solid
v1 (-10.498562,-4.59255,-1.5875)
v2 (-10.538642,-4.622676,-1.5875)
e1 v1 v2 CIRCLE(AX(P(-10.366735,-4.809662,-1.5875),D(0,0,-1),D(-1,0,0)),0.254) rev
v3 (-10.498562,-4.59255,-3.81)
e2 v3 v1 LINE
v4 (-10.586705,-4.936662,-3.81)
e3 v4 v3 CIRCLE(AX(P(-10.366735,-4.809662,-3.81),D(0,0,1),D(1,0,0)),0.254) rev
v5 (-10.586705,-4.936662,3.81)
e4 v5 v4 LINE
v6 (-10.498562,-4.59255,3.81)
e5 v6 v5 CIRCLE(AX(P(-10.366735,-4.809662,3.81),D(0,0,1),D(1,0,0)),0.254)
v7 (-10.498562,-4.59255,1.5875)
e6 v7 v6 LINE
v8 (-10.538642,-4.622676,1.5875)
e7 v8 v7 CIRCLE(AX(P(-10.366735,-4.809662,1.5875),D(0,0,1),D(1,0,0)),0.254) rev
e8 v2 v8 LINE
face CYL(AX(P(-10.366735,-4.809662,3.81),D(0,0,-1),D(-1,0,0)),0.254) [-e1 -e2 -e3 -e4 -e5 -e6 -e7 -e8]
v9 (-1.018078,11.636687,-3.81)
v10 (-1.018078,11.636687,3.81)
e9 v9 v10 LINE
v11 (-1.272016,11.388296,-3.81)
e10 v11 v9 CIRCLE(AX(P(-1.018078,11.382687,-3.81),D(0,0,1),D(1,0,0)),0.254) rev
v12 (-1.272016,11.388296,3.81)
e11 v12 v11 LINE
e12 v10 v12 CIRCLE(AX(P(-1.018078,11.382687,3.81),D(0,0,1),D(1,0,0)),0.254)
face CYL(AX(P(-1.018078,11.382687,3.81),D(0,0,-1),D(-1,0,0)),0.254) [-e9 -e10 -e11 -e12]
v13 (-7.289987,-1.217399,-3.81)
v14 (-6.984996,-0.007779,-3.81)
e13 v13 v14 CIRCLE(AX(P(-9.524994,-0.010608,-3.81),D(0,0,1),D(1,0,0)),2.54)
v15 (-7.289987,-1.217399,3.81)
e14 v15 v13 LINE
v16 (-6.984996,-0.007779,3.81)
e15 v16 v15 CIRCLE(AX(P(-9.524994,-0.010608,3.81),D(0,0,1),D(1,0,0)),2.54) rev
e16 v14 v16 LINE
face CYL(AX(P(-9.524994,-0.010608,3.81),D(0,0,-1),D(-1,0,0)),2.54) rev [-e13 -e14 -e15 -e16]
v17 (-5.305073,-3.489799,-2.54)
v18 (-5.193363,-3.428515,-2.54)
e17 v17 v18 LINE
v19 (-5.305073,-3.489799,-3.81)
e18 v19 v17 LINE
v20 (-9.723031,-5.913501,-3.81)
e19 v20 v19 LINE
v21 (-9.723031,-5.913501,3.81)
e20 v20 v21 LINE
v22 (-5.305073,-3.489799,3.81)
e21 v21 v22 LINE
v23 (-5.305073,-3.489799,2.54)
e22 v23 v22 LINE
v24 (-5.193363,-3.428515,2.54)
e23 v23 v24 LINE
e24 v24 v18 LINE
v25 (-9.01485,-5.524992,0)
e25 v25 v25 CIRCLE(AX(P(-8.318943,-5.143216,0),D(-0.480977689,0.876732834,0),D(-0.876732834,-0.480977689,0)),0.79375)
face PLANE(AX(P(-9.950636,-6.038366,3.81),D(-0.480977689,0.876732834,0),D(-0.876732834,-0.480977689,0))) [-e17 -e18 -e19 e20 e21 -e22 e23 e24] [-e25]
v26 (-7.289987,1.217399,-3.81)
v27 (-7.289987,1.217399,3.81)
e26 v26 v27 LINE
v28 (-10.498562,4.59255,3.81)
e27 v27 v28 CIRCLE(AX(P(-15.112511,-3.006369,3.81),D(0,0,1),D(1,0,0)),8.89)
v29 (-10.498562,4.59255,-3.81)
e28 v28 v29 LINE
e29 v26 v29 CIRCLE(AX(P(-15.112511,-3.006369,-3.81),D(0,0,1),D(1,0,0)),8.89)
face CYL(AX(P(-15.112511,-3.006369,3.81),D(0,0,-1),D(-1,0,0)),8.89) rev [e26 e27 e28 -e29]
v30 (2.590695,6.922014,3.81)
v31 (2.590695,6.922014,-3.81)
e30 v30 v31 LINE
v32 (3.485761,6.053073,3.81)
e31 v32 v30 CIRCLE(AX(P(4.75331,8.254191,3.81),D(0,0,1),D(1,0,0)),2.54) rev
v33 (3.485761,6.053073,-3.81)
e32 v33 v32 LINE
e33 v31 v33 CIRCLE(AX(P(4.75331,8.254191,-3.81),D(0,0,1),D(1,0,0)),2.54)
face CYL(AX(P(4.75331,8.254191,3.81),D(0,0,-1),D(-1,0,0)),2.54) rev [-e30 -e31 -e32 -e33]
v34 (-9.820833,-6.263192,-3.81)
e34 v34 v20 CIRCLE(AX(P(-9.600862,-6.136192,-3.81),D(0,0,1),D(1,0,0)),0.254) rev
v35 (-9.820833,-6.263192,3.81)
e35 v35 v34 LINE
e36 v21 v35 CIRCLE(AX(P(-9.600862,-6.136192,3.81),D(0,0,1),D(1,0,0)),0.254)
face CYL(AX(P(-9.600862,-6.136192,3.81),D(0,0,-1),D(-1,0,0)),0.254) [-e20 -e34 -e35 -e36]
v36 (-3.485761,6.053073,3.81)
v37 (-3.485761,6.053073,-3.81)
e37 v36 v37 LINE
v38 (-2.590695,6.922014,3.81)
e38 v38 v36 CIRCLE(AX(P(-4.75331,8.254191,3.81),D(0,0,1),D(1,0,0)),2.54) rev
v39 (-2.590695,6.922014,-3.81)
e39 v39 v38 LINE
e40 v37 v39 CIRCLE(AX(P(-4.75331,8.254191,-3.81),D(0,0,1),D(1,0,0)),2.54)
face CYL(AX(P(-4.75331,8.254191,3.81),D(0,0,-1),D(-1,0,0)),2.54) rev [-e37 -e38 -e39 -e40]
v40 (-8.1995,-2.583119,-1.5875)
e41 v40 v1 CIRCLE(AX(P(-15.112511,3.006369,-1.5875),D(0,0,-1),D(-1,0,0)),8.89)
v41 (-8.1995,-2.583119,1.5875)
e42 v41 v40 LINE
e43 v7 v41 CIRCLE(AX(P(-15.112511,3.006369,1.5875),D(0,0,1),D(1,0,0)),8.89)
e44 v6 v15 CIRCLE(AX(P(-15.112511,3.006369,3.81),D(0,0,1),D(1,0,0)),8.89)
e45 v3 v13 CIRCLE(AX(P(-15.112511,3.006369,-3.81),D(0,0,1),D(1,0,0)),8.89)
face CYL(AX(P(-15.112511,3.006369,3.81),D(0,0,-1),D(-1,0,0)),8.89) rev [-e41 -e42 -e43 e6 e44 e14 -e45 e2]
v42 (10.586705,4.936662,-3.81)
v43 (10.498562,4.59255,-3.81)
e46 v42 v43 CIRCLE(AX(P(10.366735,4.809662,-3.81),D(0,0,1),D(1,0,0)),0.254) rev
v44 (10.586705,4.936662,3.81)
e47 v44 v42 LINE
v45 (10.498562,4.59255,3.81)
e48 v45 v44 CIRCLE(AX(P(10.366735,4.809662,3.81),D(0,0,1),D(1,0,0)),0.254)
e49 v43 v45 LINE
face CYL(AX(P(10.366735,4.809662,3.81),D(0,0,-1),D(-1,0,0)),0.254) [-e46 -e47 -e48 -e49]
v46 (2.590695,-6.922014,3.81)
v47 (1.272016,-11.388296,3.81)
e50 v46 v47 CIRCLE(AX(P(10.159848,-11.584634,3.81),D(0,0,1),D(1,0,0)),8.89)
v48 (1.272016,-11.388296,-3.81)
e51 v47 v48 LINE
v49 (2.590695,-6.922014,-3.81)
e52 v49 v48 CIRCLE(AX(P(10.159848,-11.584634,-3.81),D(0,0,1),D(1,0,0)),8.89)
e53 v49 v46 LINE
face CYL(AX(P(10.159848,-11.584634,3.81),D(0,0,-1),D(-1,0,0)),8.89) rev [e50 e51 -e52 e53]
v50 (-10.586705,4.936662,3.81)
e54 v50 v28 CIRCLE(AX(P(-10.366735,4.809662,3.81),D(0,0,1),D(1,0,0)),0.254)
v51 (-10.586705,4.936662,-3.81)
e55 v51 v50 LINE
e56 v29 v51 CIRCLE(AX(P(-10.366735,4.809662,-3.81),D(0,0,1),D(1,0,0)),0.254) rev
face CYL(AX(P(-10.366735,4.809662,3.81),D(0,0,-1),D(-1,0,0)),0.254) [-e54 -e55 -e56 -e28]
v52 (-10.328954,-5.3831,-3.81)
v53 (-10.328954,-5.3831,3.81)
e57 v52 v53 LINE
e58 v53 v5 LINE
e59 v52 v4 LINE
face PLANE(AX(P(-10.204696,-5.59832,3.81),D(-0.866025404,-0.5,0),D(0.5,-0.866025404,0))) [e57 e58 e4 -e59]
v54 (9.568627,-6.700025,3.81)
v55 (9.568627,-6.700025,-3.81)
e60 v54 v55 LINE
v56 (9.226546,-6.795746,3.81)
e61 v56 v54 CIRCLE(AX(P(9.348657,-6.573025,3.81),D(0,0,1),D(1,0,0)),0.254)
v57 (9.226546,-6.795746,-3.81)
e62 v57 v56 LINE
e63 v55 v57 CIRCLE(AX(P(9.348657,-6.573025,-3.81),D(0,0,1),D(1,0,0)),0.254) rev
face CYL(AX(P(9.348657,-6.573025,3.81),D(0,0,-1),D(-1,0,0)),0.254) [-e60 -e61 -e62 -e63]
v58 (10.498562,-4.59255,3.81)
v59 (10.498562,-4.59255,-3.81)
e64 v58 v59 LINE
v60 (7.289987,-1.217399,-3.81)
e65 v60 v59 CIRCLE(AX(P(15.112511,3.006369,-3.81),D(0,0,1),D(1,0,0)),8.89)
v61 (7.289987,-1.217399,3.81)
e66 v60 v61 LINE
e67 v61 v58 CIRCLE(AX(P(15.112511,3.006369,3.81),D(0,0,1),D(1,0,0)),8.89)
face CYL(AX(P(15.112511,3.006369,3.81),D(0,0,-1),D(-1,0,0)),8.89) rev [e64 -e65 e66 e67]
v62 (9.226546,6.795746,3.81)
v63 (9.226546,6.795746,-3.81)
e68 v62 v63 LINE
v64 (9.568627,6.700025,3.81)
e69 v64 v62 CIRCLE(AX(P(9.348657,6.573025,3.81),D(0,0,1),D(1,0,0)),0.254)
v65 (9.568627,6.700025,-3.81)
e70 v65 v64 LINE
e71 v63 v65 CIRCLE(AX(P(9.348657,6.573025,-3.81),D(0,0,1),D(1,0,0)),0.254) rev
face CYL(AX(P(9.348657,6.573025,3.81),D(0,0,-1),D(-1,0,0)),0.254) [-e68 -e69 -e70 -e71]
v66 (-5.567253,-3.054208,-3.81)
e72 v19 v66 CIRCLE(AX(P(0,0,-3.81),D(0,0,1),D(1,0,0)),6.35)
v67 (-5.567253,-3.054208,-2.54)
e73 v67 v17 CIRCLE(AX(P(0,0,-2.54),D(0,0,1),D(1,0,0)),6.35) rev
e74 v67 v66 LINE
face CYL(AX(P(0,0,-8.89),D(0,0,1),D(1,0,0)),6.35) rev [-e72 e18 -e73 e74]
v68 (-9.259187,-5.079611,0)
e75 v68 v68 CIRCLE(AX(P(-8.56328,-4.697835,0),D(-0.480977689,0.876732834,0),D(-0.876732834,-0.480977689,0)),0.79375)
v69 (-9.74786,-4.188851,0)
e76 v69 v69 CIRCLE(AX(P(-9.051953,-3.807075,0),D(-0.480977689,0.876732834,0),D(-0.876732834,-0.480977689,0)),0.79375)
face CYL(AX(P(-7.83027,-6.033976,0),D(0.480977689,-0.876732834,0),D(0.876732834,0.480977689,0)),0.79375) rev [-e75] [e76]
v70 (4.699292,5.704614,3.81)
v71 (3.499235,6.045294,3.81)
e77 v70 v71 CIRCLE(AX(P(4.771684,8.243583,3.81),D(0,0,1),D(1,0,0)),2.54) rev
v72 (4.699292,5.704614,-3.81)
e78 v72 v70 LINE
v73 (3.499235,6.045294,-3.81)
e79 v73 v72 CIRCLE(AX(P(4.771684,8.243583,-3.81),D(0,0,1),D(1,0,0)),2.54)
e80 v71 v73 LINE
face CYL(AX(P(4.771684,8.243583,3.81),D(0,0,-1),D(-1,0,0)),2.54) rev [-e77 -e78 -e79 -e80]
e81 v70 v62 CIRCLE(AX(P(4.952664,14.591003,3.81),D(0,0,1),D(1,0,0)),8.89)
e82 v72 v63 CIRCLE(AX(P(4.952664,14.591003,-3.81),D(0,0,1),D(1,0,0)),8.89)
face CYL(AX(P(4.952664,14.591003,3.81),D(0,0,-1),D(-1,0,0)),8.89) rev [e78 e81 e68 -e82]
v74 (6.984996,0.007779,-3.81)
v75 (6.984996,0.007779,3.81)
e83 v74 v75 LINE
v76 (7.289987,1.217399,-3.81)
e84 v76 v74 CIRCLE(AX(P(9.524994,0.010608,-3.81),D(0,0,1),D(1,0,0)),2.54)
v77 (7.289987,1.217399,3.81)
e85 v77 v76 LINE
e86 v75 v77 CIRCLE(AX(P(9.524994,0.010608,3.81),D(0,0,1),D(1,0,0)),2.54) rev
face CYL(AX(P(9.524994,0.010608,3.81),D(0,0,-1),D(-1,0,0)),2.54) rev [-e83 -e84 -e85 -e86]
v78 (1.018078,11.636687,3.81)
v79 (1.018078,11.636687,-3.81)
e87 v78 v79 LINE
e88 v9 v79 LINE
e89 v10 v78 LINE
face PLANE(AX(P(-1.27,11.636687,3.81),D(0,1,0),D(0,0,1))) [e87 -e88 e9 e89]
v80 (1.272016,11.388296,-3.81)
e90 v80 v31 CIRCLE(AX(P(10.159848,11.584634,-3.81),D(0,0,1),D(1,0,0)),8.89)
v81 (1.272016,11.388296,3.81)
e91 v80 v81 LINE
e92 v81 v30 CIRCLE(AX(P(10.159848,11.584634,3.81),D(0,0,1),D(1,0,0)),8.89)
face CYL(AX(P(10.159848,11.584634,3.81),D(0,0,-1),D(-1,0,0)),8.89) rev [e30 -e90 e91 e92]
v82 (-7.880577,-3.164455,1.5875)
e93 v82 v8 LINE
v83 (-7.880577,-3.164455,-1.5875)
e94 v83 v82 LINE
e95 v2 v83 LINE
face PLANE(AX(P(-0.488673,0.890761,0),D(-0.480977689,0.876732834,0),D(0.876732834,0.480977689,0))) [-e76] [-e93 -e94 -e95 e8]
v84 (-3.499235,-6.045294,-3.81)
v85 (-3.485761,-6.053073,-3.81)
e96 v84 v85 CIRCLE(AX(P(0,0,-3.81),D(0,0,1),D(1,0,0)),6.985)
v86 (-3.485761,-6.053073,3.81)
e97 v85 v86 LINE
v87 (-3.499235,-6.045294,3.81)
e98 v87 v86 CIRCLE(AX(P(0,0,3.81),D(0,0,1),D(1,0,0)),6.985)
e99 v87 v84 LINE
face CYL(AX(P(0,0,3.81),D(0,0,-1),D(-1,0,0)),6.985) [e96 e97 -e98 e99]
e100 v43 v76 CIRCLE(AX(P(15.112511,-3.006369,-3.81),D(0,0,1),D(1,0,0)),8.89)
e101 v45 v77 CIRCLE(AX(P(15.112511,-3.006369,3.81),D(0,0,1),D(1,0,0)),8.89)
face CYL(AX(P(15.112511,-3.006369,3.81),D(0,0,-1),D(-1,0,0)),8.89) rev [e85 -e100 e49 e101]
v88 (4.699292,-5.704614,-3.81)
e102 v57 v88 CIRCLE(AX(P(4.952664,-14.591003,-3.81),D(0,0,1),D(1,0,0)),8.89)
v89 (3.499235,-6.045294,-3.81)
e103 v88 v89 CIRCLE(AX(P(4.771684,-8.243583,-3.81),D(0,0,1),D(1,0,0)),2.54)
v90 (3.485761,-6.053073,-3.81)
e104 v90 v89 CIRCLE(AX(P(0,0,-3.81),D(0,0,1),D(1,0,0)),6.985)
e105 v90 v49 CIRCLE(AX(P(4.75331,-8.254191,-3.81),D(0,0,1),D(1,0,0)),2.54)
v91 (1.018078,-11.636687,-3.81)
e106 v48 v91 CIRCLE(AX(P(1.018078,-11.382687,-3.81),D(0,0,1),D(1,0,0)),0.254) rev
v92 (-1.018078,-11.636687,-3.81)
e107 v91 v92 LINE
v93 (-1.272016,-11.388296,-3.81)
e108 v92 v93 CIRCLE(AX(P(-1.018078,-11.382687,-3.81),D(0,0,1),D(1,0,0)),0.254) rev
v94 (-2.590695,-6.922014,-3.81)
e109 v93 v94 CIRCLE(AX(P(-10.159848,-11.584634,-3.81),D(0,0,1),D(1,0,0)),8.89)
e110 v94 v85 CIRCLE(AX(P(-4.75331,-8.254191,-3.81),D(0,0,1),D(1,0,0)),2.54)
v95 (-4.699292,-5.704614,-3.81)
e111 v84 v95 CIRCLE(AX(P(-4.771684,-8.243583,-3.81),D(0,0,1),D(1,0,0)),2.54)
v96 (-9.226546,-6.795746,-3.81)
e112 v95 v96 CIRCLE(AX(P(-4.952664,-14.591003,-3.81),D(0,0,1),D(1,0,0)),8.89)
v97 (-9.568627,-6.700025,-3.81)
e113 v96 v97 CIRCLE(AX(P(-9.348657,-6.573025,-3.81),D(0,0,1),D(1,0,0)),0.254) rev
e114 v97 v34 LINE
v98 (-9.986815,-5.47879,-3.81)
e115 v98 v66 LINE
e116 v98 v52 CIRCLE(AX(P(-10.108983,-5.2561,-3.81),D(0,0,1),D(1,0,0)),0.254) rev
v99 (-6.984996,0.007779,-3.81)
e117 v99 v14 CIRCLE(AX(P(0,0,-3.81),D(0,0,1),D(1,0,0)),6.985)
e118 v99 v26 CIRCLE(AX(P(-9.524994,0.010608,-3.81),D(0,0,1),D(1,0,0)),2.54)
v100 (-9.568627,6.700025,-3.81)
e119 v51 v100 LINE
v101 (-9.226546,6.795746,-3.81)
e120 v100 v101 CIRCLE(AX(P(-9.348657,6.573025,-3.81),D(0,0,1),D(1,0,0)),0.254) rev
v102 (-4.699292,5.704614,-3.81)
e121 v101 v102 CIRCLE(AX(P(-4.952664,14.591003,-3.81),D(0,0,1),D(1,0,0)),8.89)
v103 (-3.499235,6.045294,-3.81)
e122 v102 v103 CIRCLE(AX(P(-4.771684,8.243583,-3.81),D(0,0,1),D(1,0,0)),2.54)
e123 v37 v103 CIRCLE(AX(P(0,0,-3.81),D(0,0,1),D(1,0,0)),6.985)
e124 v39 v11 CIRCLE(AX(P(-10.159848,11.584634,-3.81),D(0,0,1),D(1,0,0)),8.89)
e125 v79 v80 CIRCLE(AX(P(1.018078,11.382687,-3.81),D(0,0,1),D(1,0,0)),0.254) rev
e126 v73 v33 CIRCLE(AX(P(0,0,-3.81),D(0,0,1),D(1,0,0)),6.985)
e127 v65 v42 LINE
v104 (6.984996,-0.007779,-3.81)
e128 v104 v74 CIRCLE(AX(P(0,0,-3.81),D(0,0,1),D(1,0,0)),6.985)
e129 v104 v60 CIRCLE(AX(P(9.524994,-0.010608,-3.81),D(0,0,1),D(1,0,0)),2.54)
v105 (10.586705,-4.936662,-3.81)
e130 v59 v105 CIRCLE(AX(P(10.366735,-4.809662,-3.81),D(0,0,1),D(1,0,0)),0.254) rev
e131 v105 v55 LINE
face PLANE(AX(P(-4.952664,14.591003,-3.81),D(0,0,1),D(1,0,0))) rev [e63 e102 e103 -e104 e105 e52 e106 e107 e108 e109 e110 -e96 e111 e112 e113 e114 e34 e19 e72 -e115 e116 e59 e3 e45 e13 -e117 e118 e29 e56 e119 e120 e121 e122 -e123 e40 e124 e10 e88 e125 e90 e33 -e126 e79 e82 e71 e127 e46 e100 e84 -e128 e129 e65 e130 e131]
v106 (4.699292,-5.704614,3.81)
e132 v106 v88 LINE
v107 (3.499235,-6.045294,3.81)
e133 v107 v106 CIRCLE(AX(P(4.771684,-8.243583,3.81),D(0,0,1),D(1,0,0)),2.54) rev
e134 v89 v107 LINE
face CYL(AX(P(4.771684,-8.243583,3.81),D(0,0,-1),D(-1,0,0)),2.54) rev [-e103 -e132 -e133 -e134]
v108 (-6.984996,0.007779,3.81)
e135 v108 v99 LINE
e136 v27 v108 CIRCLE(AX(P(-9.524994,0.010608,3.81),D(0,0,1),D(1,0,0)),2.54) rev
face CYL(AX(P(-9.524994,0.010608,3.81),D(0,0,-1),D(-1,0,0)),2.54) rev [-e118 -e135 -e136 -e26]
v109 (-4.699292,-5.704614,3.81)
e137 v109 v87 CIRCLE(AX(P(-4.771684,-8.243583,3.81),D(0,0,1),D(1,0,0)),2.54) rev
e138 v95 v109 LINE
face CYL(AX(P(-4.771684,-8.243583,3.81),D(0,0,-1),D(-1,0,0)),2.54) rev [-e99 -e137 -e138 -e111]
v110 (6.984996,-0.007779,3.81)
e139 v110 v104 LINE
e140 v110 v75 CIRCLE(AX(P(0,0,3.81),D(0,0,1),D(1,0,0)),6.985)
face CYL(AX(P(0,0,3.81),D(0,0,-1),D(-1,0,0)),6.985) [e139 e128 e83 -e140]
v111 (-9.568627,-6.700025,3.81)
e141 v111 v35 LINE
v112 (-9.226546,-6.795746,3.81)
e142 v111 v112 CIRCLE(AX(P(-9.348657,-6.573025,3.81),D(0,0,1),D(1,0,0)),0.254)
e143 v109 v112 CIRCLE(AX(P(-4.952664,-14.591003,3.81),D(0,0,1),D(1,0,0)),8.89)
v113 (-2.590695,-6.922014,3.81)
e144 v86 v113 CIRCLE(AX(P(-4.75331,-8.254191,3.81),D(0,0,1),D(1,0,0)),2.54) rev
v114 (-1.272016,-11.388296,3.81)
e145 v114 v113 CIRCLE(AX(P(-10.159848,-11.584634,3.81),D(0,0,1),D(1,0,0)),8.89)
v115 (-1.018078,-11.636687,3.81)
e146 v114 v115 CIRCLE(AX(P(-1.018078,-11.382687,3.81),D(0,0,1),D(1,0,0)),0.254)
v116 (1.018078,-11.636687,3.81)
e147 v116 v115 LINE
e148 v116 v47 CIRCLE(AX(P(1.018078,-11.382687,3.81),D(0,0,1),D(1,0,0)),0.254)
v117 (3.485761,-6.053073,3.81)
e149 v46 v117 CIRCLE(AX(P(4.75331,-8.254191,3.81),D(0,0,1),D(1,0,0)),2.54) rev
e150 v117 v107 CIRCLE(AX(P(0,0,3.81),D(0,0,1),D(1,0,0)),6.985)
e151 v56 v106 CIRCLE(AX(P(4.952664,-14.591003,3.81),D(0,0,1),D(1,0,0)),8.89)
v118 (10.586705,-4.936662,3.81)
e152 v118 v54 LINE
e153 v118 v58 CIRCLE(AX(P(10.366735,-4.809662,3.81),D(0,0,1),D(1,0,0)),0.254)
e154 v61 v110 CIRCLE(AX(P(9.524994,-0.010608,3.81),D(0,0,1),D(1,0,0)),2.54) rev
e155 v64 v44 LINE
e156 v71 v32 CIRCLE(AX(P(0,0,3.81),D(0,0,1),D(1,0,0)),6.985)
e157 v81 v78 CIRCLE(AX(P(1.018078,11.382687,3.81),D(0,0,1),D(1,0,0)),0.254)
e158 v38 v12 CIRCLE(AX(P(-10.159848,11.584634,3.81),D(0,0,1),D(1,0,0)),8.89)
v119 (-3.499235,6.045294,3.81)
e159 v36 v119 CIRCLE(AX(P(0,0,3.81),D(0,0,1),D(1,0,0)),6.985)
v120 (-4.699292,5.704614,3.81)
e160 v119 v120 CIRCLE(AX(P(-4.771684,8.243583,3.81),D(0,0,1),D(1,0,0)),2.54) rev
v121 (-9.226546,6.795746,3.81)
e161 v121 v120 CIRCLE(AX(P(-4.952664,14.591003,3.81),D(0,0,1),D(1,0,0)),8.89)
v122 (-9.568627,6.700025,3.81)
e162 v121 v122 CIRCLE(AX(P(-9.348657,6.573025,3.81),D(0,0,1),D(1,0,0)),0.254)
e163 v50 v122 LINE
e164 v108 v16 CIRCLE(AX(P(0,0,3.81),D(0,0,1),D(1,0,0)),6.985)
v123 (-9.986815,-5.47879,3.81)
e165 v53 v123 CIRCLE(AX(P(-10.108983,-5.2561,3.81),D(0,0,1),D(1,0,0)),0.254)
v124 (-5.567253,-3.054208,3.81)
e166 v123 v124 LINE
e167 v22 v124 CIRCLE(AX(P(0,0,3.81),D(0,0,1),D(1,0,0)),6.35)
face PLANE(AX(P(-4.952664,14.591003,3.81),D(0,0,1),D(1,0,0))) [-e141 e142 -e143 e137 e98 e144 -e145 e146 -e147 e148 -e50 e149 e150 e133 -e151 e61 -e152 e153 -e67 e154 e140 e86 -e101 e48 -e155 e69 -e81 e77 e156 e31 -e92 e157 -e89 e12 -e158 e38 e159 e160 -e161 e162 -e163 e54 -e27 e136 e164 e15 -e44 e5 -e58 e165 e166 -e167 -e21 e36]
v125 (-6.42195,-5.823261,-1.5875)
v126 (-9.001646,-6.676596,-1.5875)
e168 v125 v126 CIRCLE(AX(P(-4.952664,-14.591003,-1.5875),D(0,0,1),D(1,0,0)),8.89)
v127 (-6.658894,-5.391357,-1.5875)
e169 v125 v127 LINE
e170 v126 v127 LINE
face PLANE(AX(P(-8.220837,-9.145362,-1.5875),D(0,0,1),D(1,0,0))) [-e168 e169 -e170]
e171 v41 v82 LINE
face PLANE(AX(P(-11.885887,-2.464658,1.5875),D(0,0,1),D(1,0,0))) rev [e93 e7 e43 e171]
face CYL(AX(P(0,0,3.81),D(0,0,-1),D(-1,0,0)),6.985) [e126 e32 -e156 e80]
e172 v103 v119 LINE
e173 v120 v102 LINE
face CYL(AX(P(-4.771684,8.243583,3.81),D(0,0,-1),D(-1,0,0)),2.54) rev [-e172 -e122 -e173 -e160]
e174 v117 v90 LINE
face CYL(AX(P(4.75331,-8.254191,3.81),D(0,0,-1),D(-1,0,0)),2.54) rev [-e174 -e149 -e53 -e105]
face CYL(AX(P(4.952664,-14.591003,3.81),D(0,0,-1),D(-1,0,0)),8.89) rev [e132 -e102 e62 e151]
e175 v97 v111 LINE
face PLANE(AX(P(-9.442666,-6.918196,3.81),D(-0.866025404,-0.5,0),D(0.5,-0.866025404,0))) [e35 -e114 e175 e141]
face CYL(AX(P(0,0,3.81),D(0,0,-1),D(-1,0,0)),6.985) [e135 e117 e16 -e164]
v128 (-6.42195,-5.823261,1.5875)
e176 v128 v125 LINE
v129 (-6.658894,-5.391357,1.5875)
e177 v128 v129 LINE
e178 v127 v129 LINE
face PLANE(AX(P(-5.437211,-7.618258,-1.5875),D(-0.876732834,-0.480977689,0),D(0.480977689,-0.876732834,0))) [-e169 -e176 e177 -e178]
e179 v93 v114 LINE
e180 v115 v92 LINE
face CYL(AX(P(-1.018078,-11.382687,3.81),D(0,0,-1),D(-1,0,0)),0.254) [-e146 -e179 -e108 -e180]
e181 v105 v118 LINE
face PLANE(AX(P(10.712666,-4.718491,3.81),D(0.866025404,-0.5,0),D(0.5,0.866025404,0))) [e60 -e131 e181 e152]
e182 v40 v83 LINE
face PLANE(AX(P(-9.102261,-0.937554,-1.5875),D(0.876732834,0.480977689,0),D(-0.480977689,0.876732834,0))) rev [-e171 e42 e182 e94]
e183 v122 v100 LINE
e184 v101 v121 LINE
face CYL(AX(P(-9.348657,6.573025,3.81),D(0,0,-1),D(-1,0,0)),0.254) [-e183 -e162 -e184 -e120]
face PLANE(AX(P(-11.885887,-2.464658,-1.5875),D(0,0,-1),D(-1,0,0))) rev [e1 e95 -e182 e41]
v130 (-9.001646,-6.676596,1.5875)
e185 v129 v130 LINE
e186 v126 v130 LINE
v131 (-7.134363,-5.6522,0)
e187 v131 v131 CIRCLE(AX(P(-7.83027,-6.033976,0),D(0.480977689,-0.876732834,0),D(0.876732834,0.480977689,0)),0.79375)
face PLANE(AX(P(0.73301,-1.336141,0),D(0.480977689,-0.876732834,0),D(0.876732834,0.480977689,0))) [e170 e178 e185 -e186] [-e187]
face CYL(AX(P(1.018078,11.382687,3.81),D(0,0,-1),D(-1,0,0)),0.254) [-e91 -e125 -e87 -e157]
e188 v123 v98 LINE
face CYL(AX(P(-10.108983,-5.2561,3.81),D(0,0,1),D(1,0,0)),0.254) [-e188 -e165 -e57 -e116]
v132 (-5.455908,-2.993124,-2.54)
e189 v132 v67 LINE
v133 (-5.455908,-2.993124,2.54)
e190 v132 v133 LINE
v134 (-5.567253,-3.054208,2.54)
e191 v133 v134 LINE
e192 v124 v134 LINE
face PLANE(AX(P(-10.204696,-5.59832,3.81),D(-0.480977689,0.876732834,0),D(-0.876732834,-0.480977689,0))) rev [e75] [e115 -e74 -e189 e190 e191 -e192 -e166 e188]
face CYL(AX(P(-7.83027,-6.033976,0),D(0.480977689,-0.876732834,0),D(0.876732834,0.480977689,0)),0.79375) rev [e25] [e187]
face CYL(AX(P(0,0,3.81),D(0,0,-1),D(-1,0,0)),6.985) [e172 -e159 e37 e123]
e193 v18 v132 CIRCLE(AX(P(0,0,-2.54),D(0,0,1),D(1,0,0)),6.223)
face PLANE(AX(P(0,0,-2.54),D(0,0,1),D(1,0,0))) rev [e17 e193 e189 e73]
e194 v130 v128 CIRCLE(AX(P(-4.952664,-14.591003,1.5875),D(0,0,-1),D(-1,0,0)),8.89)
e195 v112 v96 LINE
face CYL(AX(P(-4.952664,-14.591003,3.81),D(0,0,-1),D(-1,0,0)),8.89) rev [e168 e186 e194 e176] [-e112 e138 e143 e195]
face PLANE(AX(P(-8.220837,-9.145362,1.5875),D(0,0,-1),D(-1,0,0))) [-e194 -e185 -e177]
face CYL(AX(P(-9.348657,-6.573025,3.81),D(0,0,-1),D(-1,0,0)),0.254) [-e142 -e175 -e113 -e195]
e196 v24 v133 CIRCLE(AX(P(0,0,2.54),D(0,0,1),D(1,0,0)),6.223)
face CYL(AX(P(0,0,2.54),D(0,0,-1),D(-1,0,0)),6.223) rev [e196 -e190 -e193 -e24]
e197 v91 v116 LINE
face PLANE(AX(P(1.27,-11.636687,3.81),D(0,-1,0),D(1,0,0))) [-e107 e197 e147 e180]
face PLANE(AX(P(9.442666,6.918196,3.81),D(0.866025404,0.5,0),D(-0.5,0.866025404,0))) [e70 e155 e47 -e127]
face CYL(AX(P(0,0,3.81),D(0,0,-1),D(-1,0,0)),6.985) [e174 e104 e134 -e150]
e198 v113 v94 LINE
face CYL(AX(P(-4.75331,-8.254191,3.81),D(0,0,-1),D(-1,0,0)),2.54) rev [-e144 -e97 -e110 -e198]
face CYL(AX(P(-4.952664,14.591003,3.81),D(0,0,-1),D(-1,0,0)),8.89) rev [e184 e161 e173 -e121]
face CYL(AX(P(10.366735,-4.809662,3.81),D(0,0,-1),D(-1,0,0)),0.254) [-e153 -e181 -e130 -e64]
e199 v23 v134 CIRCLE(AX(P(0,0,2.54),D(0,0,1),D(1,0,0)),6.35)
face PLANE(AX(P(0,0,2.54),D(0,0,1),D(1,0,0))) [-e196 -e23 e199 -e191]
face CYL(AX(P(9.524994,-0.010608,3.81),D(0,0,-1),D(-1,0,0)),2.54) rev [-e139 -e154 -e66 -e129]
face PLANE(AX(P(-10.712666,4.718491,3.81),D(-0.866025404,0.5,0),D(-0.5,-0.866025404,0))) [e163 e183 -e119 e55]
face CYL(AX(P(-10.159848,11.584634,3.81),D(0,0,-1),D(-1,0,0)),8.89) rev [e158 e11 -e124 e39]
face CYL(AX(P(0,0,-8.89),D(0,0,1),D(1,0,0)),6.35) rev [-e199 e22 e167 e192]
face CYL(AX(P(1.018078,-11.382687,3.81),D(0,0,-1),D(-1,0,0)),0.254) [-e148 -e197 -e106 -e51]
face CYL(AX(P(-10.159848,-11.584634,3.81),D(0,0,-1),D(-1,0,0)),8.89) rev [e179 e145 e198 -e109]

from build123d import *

# Parameters (mm, degrees)
BOSS_EXTRUDE2_DEPTH            = 3.81
SKETCH3_R                      = 6.35
CUT_EXTRUDE1_DEPTH             = 12.7
SKETCH4_R                      = 6.35
SKETCH4_R_2                    = 6.223
BOSS_EXTRUDE3_DEPTH            = 2.54
CUT_EXTRUDE5_DEPTH             = 8.89
SKETCH8_W                      = 3.175
SKETCH8_H                      = 3.175
CUT_EXTRUDE6_DEPTH             = 2.54
F_1_16_0_0625_DIAMETER_HOLE2_D = 1.5875
FILLET1_R                      = 2.54
FILLET2_R                      = 0.254
FILLET3_R                      = 0.254


with BuildPart() as part:
    # Sketch1 → Boss-Extrude2 (new, symmetric)
    with BuildSketch(Plane.XY):
        with BuildLine():
            Line((-1.27, 11.636686539), (1.27, 11.636686539))
            ThreePointArc((1.27, 11.636686539), (1.707470415, 8.829743837), (3.008049424, 6.30411482))
            ThreePointArc((3.008049424, 6.30411482), (3.4925, 6.049187445), (3.95549887, 5.757104627))
            ThreePointArc((3.95549887, 5.757104627), (6.793047264, 5.893584674), (9.442666158, 6.918195532))
            Line((9.442666158, 6.918195532), (10.712666158, 4.718491007))
            ThreePointArc((10.712666158, 4.718491007), (8.50051768, 2.936159163), (6.963548294, 0.547010193))
            ThreePointArc((6.963548294, 0.547010193), (6.985, 0), (6.963548294, -0.547010193))
            ThreePointArc((6.963548294, -0.547010193), (8.50051768, -2.936159163), (10.712666158, -4.718491007))
            Line((10.712666158, -4.718491007), (9.442666158, -6.918195532))
            ThreePointArc((9.442666158, -6.918195532), (6.793047264, -5.893584674), (3.95549887, -5.757104627))
            ThreePointArc((3.95549887, -5.757104627), (3.4925, -6.049187445), (3.008049424, -6.30411482))
            ThreePointArc((3.008049424, -6.30411482), (1.707470415, -8.829743837), (1.27, -11.636686539))
            Line((1.27, -11.636686539), (-1.27, -11.636686539))
            ThreePointArc((-1.27, -11.636686539), (-1.707470415, -8.829743837), (-3.008049424, -6.30411482))
            ThreePointArc((-3.008049424, -6.30411482), (-3.4925, -6.049187445), (-3.95549887, -5.757104627))
            ThreePointArc((-3.95549887, -5.757104627), (-6.793047264, -5.893584674), (-9.442666158, -6.918195532))
            Line((-9.442666158, -6.918195532), (-9.950635894, -6.038366142))
            Line((-9.950635894, -6.038366142), (-5.86342506, -3.796112691))
            ThreePointArc((-5.86342506, -3.796112691), (-5.99767393, -3.580241951), (-6.123978846, -3.359629161))
            Line((-6.123978846, -3.359629161), (-10.204696423, -5.598320397))
            Line((-10.204696423, -5.598320397), (-10.712666158, -4.718491007))
            ThreePointArc((-10.712666158, -4.718491007), (-8.50051768, -2.936159163), (-6.963548294, -0.547010193))
            ThreePointArc((-6.963548294, -0.547010193), (-6.985, 0), (-6.963548294, 0.547010193))
            ThreePointArc((-6.963548294, 0.547010193), (-8.50051768, 2.936159163), (-10.712666158, 4.718491007))
            Line((-10.712666158, 4.718491007), (-9.442666158, 6.918195532))
            ThreePointArc((-9.442666158, 6.918195532), (-6.793047264, 5.893584674), (-3.95549887, 5.757104627))
            ThreePointArc((-3.95549887, 5.757104627), (-3.4925, 6.049187445), (-3.008049424, 6.30411482))
            ThreePointArc((-3.008049424, 6.30411482), (-1.707470415, 8.829743837), (-1.27, 11.636686539))
        make_face()
    extrude(amount=BOSS_EXTRUDE2_DEPTH, both=True)

    # Sketch3 → Cut-Extrude1 (cut)
    with BuildSketch(Plane.XY.offset(3.81)):
        Circle(SKETCH3_R)
    extrude(amount=-CUT_EXTRUDE1_DEPTH, mode=Mode.SUBTRACT)

    # Sketch4 → Boss-Extrude3 (add, symmetric)
    with BuildSketch(Plane.XY):
        Circle(SKETCH4_R)
        Circle(SKETCH4_R_2, mode=Mode.SUBTRACT)
    extrude(amount=BOSS_EXTRUDE3_DEPTH, both=True)

    # Sketch7 → Cut-Extrude5 (cut)
    with BuildSketch(Plane(origin=(0, 0, -3.81), x_dir=(-1, 0, 0), z_dir=(0, 0, -1))):
        Polygon((6.123978846, -3.359629161), (4.840992118, -2.655779632), (4.596655451, -3.101159912), (5.86342506, -3.796112691), (6.123978846, -3.939053109), (6.368315512, -3.493672829), align=None)
    extrude(amount=-CUT_EXTRUDE5_DEPTH, mode=Mode.SUBTRACT)

    # Sketch8 → Cut-Extrude6 (cut)
    with BuildSketch(Plane(origin=(0.733009999, -1.336140839, 0), x_dir=(-0.8767328340240498, -0.4809776894453194, 0), z_dir=(0.4809776894453194, -0.8767328340240498, 0))):
        with Locations((10.018693164, 0)):
            Rectangle(SKETCH8_W, SKETCH8_H)
    cut_extrude6 = extrude(amount=CUT_EXTRUDE6_DEPTH, mode=Mode.SUBTRACT)

    # Mirror2: Cut-Extrude6 across plane
    add(cut_extrude6.mirror(Plane(origin=(0.122168333, -0.22269014, 0), x_dir=(0, 0, 1), z_dir=(0.4809776894453193, -0.8767328340240499, 0))), mode=Mode.SUBTRACT)

    # 1/16 (0.0625) Diameter Hole2 (through all)
    with Locations(Plane(origin=(0.733009999, -1.336140839, 0), x_dir=(-0.8767328340240498, -0.4809776894453194, 0), z_dir=(0.4809776894453194, -0.8767328340240498, 0))):
        with Locations((9.767262648, 0)):
            Hole(F_1_16_0_0625_DIAMETER_HOLE2_D / 2)

    # Fillet1
    fillet1_edges = [part.edges().sort_by_distance(p)[0] for p in [
        (-6.963548294, 0.547010193, 0),
        (-6.963548294, -0.547010193, 0),
        (-3.95549887, -5.757104627, 0),
        (-3.008049424, -6.30411482, 0),
        (3.008049424, -6.30411482, 0),
        (3.95549887, -5.757104627, 0),
        (6.963548294, -0.547010193, 0),
        (6.963548294, 0.547010193, 0),
        (3.95549887, 5.757104627, 0),
        (3.008049424, 6.30411482, 0),
        (-3.008049424, 6.30411482, 0),
        (-3.95549887, 5.757104627, 0),
    ]]
    fillet(fillet1_edges, radius=FILLET1_R)

    # Fillet2
    # the kernel refuses this fillet: 0.254 mm, written as the material it takes off along each edge
    with BuildSketch(Plane(origin=(-10.204696423, -5.598320397, 4.431287546), x_dir=(-0.4999999999999982, 0.8660254037844397, 0), z_dir=(0, 0, -1))) as fillet2_piece_1:
        with BuildLine():
            CenterArc((FILLET2_R * 0.978405584541, FILLET2_R), FILLET2_R, 181.250724062, 88.749275938)
            Line((-FILLET2_R * 0.0213561667787, FILLET2_R * 0.978172480701), (0, 0))
            Line((0, 0), (FILLET2_R * 0.978405584541, 0))
        make_face()
    extrude(amount=8.862575092, mode=Mode.SUBTRACT)
    with BuildSketch(Plane(origin=(-9.442666158, -6.918195532, 4.439805222), x_dir=(-0.5000000000000004, 0.8660254037844385, 0), z_dir=(0, 0, -1)), Plane(origin=(1.27, -11.636686539, 4.439805222), x_dir=(-1, 0, 0), z_dir=(0, 0, -1))) as fillet2_piece_2:
        with BuildLine():
            CenterArc((0.251922089, 0.254), FILLET2_R, 181.265494036, 88.734505964)
            ThreePointArc((-0.002015959, 0.248390349), (-0.000140392, 0.124202216), (0, 0))
            Line((0, 0), (0.251922089, 0))
        make_face()
    extrude(amount=8.879610443, mode=Mode.SUBTRACT)
    with BuildSketch(Plane(origin=(-1.27, -11.636686539, 4.439805222), x_dir=(-0.008115823056968435, 0.9999670661657352, 0), z_dir=(0, 0, -1)), Plane(origin=(-10.712666158, -4.718491007, 4.439805222), x_dir=(0.8619389707188404, 0.5070120420228162, 0), z_dir=(0, 0, -1))) as fillet2_piece_3:
        with BuildLine():
            CenterArc((0.25194708, 0.253975211), FILLET2_R, 180.465007513, 88.734505964)
            Line((-0.002044555, 0.251913792), (0, 0))
            ThreePointArc((0, 0), (0.124199265, 0.000867616), (0.248398529, 0))
        make_face()
    extrude(amount=8.879610443, mode=Mode.SUBTRACT)
    with BuildSketch(Plane(origin=(10.712666158, 4.718491007, 4.439805222), x_dir=(-0.5000000000000051, 0.8660254037844357, 0), z_dir=(0, 0, -1)), Plane(origin=(9.442666158, -6.918195532, 4.439805222), x_dir=(0.5000000000000029, 0.866025403784437, 0), z_dir=(0, 0, -1)), Plane(origin=(1.27, 11.636686539, 4.439805222), x_dir=(-1, 0, 0), z_dir=(0, 0, -1))) as fillet2_piece_4:
        with BuildLine():
            CenterArc((0.251922089, -0.254), FILLET2_R, 90, 88.734505964)
            ThreePointArc((-0.002015959, -0.248390349), (-0.000140392, -0.124202216), (0, 0))
            Line((0, 0), (0.251922089, 0))
        make_face()
    extrude(amount=8.879610443, mode=Mode.SUBTRACT)
    with BuildSketch(Plane(origin=(9.442666158, 6.918195532, 4.439805222), x_dir=(-0.8700547937758036, -0.4929550241429169, 0), z_dir=(0, 0, -1)), Plane(origin=(10.712666158, -4.718491007, 4.439805222), x_dir=(-0.8619389707188434, 0.5070120420228111, 0), z_dir=(0, 0, -1)), Plane(origin=(-9.442666158, 6.918195532, -4.439805222), x_dir=(0.8700547937757986, -0.4929550241429255, 0), z_dir=(0, 0, 1)), Plane(origin=(-1.27, 11.636686539, 4.439805222), x_dir=(-0.008115823056962063, -0.9999670661657353, 0), z_dir=(0, 0, -1))) as fillet2_piece_5:
        with BuildLine():
            CenterArc((0.25194708, -0.253975211), FILLET2_R, 90.800486523, 88.734505964)
            Line((-0.002044555, -0.251913792), (0, 0))
            ThreePointArc((0, 0), (0.124199265, -0.000867616), (0.248398529, 0))
        make_face()
    extrude(amount=8.879610443, mode=Mode.SUBTRACT)
    with BuildSketch(Plane(origin=(-9.950635894, -6.038366142, 4.459015102), x_dir=(0.8767328340240489, 0.48097768944532077, 0), z_dir=(0, 0, -1))) as fillet2_piece_6:
        with BuildLine():
            CenterArc((FILLET2_R * 1.02207102637, FILLET2_R), FILLET2_R, 178.749275938, 91.250724062)
            Line((FILLET2_R * 0.0223092750529, FILLET2_R * 1.0218275193), (0, 0))
            Line((0, 0), (FILLET2_R * 1.02207102637, 0))
        make_face()
    extrude(amount=8.918030203, mode=Mode.SUBTRACT)

    # Fillet3
    fillet3_edges = [part.edges().sort_by_distance(p)[0] for p in [
        (-10.712666158, 4.718491007, 0),
    ]]
    fillet(fillet3_edges, radius=FILLET3_R)


solid = part.part
